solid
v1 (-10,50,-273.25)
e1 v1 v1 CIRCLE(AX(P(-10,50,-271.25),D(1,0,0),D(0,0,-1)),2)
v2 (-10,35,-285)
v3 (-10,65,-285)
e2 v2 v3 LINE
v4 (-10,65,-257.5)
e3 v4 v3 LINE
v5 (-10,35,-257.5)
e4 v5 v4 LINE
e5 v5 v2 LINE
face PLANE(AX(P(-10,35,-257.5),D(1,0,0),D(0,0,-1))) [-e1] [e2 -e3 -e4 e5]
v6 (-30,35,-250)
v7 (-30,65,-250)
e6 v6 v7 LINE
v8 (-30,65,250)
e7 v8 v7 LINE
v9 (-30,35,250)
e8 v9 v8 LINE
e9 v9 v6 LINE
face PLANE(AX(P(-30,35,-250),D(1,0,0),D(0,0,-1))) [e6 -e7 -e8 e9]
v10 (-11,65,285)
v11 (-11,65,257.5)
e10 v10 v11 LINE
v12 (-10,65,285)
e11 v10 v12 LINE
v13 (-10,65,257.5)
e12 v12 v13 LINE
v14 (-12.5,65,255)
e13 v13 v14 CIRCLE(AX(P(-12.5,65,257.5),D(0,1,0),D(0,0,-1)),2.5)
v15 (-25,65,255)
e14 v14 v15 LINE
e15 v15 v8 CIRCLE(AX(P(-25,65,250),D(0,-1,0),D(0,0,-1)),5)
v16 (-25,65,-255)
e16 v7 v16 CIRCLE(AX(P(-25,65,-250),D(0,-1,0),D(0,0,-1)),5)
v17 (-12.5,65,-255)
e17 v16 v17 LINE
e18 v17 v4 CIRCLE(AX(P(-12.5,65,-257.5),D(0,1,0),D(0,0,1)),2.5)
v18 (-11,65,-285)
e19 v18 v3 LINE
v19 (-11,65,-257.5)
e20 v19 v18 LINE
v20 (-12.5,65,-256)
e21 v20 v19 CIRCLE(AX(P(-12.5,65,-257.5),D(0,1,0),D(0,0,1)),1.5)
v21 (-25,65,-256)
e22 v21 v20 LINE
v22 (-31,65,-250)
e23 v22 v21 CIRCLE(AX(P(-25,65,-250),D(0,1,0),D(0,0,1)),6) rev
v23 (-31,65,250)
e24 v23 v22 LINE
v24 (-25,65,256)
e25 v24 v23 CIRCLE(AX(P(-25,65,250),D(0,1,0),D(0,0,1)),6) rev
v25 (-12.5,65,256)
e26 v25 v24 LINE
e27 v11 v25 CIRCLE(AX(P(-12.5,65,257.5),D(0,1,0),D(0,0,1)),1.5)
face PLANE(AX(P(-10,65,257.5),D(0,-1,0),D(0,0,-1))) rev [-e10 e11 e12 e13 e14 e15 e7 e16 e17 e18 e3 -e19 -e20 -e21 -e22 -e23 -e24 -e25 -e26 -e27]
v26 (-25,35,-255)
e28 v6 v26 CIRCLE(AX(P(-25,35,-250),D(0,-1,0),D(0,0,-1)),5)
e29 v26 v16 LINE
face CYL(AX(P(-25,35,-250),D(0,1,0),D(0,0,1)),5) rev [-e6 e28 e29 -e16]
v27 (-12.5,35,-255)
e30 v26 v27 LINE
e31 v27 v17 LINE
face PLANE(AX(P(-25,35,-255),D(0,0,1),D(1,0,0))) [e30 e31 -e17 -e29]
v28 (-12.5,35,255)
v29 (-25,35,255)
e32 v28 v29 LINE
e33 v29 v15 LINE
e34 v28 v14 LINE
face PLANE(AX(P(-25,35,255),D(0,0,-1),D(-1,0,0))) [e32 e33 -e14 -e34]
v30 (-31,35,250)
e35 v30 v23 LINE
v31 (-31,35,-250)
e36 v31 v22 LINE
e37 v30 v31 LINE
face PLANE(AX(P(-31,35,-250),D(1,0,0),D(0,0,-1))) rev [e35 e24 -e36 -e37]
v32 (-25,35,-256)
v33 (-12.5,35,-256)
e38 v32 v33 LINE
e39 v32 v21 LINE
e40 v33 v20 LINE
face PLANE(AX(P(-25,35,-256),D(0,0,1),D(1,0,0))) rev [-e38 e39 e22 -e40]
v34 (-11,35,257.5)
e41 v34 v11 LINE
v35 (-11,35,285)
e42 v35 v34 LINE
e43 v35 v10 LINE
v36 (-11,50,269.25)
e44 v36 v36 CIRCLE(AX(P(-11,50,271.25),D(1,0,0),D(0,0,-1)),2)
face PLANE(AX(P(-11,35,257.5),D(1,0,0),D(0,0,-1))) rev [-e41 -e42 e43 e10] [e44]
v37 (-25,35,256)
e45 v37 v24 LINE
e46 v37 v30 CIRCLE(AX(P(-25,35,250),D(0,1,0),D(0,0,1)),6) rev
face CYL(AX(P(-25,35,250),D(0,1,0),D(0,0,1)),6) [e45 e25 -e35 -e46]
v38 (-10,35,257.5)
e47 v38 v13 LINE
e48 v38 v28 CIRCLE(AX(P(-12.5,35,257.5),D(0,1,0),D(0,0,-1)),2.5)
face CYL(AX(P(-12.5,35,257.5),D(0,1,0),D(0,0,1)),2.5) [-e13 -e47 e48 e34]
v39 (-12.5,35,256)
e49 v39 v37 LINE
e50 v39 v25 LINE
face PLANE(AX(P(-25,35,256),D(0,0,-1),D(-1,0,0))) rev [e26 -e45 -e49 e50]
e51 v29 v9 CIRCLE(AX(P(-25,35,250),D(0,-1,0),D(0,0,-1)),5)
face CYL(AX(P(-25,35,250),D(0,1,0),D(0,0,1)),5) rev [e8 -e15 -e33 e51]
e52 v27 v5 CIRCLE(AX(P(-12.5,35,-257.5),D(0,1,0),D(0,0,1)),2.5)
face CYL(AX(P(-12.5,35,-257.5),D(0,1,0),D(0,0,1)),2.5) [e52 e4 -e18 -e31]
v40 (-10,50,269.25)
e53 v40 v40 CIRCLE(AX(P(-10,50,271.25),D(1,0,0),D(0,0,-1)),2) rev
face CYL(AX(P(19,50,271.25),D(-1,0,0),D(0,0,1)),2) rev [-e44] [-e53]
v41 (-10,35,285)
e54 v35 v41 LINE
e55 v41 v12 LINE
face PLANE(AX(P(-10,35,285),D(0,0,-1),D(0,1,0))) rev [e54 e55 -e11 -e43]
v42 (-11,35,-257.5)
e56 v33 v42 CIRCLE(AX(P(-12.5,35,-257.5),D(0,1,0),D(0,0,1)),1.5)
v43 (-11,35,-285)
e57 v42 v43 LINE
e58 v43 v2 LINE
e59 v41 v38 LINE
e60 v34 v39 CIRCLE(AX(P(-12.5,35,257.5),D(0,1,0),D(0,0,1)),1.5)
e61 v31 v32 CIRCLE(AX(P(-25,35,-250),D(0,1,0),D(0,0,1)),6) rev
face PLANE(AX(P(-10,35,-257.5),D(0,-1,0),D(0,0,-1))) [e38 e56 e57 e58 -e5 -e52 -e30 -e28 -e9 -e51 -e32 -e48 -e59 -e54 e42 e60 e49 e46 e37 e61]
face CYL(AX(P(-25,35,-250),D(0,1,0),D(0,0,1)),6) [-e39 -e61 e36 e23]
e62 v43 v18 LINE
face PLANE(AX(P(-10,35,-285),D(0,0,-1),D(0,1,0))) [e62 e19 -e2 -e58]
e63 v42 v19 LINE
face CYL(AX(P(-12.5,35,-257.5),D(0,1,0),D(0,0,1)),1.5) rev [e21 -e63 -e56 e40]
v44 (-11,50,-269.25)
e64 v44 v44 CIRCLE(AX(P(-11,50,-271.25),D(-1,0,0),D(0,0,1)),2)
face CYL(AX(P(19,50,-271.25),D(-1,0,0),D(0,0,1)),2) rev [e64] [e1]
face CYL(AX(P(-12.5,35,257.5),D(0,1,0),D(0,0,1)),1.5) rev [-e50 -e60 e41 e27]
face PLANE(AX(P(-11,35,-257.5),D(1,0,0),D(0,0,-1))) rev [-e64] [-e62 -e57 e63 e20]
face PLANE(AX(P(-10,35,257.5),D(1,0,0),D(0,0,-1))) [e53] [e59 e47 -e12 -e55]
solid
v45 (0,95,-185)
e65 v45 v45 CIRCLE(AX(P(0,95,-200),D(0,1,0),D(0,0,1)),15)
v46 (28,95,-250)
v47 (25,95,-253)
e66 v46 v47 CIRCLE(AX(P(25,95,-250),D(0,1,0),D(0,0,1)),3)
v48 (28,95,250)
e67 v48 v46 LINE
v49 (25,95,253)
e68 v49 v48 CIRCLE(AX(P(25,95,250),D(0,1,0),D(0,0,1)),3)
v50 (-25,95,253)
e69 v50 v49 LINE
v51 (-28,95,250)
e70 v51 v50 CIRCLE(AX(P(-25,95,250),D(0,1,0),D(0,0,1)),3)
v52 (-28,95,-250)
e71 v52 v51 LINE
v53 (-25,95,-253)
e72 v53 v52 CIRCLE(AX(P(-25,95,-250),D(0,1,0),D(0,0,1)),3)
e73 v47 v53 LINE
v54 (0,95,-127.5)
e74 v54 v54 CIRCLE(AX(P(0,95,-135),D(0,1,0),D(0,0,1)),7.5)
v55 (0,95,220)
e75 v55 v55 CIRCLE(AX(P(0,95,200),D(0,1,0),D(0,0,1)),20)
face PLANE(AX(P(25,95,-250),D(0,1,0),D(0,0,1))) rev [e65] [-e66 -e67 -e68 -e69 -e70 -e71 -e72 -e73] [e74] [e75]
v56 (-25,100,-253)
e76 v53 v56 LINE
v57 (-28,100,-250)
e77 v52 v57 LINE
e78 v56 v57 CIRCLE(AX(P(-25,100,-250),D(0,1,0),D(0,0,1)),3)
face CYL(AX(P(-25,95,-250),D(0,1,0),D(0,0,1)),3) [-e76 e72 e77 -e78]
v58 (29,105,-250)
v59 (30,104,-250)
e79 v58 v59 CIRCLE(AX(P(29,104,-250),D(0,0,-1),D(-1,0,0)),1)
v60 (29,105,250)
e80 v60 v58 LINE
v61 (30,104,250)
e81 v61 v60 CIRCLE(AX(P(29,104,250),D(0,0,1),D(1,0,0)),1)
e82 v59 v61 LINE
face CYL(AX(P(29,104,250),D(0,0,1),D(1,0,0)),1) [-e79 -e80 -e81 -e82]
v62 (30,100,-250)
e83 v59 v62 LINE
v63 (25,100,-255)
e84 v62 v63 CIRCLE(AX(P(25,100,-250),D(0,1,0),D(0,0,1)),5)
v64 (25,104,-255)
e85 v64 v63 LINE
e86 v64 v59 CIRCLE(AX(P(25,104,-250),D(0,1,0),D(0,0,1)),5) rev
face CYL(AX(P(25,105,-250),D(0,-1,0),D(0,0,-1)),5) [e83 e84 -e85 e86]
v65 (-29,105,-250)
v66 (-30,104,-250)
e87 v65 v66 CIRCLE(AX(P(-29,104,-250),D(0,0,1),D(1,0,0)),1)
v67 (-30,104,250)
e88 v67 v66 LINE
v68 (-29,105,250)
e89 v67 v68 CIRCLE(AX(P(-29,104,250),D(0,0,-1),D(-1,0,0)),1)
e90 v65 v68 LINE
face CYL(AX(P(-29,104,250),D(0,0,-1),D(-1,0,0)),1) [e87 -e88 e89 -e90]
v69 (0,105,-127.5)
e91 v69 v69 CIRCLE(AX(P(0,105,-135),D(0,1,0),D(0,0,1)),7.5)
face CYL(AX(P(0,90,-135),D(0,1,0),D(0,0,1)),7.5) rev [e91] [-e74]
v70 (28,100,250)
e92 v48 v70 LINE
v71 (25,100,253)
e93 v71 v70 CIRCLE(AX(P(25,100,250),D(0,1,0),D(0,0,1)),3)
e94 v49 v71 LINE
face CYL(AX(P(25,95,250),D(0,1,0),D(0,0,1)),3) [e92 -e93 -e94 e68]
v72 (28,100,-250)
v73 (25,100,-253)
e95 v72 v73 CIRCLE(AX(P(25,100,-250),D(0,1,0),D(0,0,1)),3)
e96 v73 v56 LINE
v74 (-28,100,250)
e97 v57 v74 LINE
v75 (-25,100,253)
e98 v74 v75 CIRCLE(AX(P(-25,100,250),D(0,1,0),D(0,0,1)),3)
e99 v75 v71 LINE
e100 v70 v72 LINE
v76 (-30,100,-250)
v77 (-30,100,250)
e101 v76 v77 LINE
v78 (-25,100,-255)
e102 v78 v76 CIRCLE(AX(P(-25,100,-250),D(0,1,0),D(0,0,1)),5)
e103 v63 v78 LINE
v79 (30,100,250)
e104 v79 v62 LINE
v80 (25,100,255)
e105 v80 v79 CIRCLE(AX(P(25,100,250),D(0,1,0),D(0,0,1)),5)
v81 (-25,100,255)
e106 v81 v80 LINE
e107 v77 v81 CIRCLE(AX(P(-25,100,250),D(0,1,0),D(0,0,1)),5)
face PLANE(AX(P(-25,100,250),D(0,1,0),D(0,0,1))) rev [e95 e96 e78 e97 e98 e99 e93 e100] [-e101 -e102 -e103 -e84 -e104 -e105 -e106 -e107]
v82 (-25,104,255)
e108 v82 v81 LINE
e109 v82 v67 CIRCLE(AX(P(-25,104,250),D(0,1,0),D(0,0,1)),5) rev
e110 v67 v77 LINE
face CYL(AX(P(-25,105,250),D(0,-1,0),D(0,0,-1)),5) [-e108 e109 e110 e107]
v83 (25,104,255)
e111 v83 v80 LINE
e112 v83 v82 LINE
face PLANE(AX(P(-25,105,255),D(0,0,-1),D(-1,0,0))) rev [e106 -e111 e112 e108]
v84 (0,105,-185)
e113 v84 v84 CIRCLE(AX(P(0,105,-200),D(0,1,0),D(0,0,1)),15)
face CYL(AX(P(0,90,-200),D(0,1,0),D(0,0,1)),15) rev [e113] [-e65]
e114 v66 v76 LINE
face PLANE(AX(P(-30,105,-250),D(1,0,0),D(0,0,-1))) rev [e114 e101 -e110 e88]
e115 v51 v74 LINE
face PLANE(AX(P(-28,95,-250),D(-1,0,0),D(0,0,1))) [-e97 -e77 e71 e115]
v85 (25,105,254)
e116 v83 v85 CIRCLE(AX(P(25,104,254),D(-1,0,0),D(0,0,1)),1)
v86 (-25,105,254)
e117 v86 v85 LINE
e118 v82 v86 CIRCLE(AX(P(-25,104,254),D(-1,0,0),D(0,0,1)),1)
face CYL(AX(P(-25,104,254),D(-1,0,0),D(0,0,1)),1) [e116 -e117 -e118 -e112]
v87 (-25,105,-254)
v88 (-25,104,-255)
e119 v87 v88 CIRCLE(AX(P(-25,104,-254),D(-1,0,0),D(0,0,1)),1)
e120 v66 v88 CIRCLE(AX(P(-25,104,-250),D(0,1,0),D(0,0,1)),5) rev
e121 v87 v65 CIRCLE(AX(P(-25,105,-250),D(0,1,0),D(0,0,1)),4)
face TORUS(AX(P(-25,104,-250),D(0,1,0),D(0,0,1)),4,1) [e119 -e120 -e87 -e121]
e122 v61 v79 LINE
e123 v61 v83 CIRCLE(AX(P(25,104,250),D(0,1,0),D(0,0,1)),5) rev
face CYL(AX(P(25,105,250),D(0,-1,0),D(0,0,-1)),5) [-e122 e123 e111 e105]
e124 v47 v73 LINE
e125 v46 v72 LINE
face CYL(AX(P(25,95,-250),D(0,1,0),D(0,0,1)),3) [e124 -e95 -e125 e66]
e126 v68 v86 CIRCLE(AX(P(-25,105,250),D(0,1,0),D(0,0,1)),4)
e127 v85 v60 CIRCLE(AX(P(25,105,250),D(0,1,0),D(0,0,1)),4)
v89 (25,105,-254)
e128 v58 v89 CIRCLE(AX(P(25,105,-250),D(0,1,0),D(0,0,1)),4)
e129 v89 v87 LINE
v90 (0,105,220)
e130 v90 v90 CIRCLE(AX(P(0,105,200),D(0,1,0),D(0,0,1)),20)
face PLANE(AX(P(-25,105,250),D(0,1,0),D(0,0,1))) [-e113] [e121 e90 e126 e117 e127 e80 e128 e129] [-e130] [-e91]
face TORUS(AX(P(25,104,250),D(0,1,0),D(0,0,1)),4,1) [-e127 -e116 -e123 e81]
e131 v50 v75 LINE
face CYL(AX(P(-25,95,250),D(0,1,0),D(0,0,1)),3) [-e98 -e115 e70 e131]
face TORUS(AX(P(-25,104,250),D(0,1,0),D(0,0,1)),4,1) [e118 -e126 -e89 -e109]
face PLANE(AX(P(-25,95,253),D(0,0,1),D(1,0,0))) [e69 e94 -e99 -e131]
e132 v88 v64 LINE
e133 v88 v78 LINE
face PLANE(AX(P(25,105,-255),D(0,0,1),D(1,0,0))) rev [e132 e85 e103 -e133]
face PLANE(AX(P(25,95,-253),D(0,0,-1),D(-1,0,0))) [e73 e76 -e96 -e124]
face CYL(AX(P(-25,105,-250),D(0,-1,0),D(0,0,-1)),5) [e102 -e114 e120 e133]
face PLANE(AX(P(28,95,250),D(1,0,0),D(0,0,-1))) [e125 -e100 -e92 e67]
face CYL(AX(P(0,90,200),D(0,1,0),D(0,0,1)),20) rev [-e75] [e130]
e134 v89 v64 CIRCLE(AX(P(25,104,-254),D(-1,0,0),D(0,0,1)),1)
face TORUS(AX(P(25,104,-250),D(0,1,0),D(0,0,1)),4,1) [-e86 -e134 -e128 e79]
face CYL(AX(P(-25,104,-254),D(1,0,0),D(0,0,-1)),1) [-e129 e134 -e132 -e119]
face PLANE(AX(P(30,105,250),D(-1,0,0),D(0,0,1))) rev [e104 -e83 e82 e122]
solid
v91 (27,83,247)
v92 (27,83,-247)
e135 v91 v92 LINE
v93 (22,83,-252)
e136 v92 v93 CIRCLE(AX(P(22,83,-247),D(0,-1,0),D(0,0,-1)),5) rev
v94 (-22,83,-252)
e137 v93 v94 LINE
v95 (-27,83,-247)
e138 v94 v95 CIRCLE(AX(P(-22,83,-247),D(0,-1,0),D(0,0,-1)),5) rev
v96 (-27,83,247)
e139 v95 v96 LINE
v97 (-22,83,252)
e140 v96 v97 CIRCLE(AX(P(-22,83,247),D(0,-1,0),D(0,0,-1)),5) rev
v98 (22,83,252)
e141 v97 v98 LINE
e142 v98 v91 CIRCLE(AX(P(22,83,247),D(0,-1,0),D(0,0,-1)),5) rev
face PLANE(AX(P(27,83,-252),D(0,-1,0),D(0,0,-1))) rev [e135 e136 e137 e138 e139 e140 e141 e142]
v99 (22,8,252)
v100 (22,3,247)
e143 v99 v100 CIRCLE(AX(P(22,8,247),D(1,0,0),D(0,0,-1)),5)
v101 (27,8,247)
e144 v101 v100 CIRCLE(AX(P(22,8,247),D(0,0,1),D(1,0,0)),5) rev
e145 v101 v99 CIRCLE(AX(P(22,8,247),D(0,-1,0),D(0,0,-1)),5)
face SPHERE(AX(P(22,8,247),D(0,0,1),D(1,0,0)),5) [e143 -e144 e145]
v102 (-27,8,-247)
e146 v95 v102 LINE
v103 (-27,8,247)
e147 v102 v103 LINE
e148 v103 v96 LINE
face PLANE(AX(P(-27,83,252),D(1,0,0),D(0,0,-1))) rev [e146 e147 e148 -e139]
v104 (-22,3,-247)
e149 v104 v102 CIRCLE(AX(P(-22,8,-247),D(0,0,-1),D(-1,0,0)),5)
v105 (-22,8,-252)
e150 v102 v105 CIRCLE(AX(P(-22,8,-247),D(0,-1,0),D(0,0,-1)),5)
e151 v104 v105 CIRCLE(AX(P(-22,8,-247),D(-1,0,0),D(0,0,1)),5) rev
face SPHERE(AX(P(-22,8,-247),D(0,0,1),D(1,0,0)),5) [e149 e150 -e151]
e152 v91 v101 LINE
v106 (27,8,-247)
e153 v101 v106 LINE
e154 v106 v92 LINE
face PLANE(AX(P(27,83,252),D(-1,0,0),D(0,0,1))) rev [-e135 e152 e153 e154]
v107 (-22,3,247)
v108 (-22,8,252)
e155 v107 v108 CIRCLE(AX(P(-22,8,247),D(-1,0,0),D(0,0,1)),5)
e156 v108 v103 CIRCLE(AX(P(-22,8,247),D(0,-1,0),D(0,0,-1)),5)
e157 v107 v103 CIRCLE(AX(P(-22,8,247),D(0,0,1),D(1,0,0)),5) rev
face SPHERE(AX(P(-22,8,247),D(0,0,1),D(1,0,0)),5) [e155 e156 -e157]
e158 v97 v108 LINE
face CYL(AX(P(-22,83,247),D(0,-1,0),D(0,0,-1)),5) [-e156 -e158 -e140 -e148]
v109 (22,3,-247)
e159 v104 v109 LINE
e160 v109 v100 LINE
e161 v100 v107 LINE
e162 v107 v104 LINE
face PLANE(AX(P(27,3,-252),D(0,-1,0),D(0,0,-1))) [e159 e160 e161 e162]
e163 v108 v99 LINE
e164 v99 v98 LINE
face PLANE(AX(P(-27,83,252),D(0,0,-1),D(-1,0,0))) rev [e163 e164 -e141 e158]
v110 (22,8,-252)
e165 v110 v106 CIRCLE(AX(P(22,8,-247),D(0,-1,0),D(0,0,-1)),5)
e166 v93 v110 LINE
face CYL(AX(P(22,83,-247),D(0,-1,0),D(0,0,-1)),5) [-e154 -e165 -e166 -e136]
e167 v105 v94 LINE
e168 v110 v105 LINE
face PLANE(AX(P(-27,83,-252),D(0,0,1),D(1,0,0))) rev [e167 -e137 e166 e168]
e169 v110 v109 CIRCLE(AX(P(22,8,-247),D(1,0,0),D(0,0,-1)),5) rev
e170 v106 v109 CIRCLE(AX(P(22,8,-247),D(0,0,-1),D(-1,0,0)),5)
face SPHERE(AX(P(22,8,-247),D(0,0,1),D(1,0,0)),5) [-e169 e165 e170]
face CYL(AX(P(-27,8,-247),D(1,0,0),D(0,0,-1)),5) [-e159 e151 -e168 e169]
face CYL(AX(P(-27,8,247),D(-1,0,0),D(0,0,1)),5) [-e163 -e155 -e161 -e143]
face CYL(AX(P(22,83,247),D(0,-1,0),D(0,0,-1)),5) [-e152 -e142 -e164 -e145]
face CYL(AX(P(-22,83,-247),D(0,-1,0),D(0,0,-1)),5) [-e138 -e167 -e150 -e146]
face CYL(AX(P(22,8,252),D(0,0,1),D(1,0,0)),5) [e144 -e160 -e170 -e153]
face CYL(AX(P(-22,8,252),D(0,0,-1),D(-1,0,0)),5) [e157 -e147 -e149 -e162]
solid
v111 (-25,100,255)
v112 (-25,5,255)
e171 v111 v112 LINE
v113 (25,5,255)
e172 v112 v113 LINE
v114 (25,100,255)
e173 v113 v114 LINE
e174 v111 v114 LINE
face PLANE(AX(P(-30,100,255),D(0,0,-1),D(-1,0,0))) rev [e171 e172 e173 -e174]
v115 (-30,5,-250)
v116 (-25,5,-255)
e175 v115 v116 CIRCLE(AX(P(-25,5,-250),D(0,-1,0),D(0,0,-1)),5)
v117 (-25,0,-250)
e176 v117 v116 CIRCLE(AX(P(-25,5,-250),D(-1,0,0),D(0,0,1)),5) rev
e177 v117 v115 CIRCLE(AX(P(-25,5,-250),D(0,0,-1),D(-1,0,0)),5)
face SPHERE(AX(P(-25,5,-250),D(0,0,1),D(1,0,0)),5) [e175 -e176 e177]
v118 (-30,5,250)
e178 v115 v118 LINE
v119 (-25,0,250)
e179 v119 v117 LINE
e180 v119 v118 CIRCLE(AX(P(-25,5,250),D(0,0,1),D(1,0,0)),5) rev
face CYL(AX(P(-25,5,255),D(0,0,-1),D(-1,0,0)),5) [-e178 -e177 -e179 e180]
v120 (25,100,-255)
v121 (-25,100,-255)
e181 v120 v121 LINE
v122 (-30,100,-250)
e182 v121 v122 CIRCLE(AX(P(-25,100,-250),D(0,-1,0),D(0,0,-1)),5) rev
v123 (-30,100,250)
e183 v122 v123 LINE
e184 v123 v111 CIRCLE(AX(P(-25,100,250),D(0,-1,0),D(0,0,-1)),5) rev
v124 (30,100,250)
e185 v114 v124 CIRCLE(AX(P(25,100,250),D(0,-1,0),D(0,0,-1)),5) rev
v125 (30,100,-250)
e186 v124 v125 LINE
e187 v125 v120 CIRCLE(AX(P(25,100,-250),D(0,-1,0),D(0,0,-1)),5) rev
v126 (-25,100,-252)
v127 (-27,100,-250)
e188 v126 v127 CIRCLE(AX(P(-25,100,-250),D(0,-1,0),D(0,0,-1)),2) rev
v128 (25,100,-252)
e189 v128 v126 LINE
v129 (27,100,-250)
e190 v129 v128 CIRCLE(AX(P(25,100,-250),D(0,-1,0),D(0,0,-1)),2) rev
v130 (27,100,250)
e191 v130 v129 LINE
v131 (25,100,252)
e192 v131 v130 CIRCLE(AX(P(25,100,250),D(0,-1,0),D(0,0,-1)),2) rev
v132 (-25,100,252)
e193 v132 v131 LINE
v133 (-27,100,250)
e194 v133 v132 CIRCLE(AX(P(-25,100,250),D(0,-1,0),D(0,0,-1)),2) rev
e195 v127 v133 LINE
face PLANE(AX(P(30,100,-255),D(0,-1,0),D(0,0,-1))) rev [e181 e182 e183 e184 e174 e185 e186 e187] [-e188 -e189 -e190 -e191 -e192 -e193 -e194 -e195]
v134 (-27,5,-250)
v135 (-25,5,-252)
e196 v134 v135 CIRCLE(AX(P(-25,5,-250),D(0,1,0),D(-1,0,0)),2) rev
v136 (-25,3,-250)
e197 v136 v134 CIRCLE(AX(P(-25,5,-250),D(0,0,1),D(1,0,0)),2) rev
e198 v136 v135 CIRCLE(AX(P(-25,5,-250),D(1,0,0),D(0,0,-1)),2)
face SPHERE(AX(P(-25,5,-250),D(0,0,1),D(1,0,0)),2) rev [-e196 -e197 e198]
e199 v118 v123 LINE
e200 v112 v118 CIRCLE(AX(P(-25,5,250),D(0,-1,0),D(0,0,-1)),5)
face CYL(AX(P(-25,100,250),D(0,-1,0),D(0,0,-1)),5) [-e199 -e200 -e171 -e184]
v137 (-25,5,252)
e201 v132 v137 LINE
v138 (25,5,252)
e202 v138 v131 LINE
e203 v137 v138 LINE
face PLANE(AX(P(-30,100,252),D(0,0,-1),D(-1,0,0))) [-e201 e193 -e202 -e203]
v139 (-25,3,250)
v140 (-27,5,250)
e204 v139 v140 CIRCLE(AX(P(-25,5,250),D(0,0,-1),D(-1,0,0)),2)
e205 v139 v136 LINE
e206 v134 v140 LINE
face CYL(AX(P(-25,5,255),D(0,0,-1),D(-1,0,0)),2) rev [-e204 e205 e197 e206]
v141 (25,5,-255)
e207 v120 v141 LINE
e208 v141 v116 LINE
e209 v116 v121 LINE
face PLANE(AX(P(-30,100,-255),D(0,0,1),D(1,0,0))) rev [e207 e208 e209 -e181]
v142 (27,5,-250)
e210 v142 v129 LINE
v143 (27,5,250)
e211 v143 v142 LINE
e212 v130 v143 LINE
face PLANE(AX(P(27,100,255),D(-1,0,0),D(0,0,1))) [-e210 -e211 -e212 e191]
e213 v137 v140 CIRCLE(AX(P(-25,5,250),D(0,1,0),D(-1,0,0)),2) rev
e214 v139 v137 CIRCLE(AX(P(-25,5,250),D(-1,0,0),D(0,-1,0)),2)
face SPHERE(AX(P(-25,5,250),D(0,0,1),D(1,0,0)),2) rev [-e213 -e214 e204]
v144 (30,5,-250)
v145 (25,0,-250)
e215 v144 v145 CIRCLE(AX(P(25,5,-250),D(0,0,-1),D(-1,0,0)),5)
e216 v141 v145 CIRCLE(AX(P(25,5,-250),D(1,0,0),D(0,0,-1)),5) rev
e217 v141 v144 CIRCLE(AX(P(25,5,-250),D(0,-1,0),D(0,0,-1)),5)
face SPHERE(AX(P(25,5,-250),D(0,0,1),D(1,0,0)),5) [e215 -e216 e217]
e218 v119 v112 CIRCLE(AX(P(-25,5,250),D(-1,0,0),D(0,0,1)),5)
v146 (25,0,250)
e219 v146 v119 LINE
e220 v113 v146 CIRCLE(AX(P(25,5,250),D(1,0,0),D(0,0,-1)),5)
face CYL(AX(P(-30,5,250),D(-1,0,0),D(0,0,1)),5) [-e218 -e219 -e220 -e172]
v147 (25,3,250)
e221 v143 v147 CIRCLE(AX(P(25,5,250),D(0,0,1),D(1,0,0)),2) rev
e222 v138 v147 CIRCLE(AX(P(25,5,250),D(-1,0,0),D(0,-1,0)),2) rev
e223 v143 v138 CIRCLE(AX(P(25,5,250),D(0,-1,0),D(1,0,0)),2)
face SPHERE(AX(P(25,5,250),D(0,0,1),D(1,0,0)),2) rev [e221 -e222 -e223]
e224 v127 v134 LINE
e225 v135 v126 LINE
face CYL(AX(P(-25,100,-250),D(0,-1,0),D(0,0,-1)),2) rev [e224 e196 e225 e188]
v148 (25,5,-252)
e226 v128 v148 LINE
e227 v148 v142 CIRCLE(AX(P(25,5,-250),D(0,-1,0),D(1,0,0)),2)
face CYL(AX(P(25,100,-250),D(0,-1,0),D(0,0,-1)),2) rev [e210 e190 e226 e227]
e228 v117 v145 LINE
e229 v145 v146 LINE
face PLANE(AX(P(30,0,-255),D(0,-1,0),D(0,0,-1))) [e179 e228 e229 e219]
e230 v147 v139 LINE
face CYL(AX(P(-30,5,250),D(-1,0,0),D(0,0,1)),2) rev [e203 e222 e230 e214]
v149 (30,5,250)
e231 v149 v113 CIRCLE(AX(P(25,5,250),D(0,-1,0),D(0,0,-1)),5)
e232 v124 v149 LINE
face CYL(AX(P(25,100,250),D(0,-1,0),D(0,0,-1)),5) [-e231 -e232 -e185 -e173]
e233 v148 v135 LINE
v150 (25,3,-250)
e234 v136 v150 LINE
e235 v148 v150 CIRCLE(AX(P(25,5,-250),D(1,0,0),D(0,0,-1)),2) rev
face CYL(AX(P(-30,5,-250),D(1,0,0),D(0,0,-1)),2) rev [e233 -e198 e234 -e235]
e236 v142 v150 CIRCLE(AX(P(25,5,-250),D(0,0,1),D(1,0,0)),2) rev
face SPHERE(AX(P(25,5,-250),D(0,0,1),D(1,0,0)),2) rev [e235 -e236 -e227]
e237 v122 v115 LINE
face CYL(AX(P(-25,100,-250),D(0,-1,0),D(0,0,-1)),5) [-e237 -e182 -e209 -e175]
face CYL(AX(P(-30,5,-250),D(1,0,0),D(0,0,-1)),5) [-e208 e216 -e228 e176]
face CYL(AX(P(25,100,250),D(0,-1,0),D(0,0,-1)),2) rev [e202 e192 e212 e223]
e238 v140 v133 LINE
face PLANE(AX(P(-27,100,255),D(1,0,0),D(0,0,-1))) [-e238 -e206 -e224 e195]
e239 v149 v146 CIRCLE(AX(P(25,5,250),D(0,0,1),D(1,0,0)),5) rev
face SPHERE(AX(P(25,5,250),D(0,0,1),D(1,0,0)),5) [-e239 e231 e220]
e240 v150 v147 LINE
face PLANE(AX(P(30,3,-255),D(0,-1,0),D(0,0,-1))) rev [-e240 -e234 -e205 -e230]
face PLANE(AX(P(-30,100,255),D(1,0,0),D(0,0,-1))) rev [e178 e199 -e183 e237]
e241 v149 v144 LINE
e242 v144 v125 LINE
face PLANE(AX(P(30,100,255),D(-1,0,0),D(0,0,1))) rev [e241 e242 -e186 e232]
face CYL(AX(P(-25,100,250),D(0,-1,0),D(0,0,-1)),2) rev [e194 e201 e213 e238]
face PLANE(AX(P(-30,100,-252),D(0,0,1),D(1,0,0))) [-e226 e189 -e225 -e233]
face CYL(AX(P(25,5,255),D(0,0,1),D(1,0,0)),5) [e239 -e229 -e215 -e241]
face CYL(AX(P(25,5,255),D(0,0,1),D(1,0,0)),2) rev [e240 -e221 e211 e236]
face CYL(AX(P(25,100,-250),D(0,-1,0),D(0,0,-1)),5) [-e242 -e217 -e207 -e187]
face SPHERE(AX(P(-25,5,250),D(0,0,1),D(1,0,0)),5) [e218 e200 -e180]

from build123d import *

# Parameters (mm, degrees)
CROQUIS1_W         = 60
CROQUIS1_H         = 510
EXTRUIR1_DEPTH     = 100
REDONDEO1_R        = 5
VACIADO1_T         = -3
CROQUIS2_W         = 54
CROQUIS2_H         = 504
EXTRUIR2_DEPTH     = 80
REDONDEO2_R        = 5
EXTRUIR3_DEPTH     = 5
EXTRUIR4_START     = 5
EXTRUIR4_DEPTH     = 5
REDONDEO3_R        = 1
CROQUIS5_R         = 15
CROQUIS5_R_2       = 7.5
CROQUIS5_R_3       = 20
EXTRUIR5_DEPTH     = 15
DAR_START          = 35
DAR_ESPESOR1_DEPTH = 30
CROQUIS7_R         = 2
EXTRUIR6_DEPTH     = 30


# Read off the part's stored shape, not the designer's step: Dar espesor1
with BuildPart() as part:
    # Croquis1 → Extruir1 (new body)
    with BuildSketch(Plane(origin=(0, 0, 0), x_dir=(1, 0, 0), z_dir=(0, 1, 0))):
        Rectangle(CROQUIS1_W, CROQUIS1_H)
    extrude(amount=EXTRUIR1_DEPTH)

    # Redondeo1
    redondeo1_edges = [part.edges().sort_by_distance(p)[0] for p in [
        (0, 0, 255),
        (-30, 0, 0),
        (0, 0, -255),
        (30, 0, 0),
        (30, 50, 255),
        (-30, 50, 255),
        (-30, 50, -255),
        (30, 50, -255),
    ]]
    fillet(redondeo1_edges, radius=REDONDEO1_R)

    # Vaciado1
    vaciado1_openings = [part.faces().sort_by_distance(p)[0] for p in [
        (0, 100, 0),
    ]]
    offset(amount=VACIADO1_T, openings=vaciado1_openings, kind=Kind.INTERSECTION)


with BuildPart() as body_2:
    # Croquis2 → Extruir2 (new body)
    with BuildSketch(Plane(origin=(0, 3, 0), x_dir=(1, 0, 0), z_dir=(0, 1, 0))):
        Rectangle(CROQUIS2_W, CROQUIS2_H)
    extrude(amount=EXTRUIR2_DEPTH)

    # Redondeo2
    redondeo2_edges = [body_2.edges().sort_by_distance(p)[0] for p in [
        (0, 3, 252),
        (-27, 3, 0),
        (0, 3, -252),
        (27, 3, 0),
        (27, 43, 252),
        (-27, 43, 252),
        (-27, 43, -252),
        (27, 43, -252),
    ]]
    fillet(redondeo2_edges, radius=REDONDEO2_R)


with BuildPart() as body_3:
    # Croquis3 → Extruir3 (new body)
    with BuildSketch(Plane(origin=(0, 100, 0), x_dir=(1, 0, 0), z_dir=(0, 1, 0))):
        with BuildLine():
            Line((25, 253), (-25, 253))
            ThreePointArc((-25, 253), (-27.121320344, 252.121320344), (-28, 250))
            Line((-28, 250), (-28, -250))
            ThreePointArc((-28, -250), (-27.121320344, -252.121320344), (-25, -253))
            Line((-25, -253), (25, -253))
            ThreePointArc((25, -253), (27.121320344, -252.121320344), (28, -250))
            Line((28, -250), (28, 250))
            ThreePointArc((28, 250), (27.121320344, 252.121320344), (25, 253))
        make_face()
    extrude(amount=-EXTRUIR3_DEPTH)

    # Croquis4 → Extruir4 (add)
    with BuildSketch(Plane(origin=(0, 100, 0), x_dir=(1, 0, 0), z_dir=(0, 1, 0)).offset(EXTRUIR4_START)):
        with BuildLine():
            Line((-25, -255), (25, -255))
            ThreePointArc((25, -255), (28.535533906, -253.535533906), (30, -250))
            Line((30, -250), (30, 250))
            ThreePointArc((30, 250), (28.535533906, 253.535533906), (25, 255))
            Line((25, 255), (-25, 255))
            ThreePointArc((-25, 255), (-28.535533906, 253.535533906), (-30, 250))
            Line((-30, 250), (-30, -250))
            ThreePointArc((-30, -250), (-28.535533906, -253.535533906), (-25, -255))
        make_face()
    extrude(amount=-EXTRUIR4_DEPTH)

    # Redondeo3
    redondeo3_edges = [body_3.edges().sort_by_distance(p)[0] for p in [
        (-28.535533906, 105, 253.535533906),
        (0, 105, 255),
        (28.535533906, 105, 253.535533906),
        (30, 105, 0),
        (28.535533906, 105, -253.535533906),
        (0, 105, -255),
        (-28.535533906, 105, -253.535533906),
        (-30, 105, 0),
    ]]
    fillet(redondeo3_edges, radius=REDONDEO3_R)

    # Croquis5 → Extruir5 (cut)
    with BuildSketch(Plane(origin=(0, 105, 0), x_dir=(1, 0, 0), z_dir=(0, 1, 0))):
        with Locations(Location((0, 200, 0), (0, 0, 270))):
            Circle(CROQUIS5_R)
        with Locations(Location((0, 135, 0), (0, 0, 270))):
            Circle(CROQUIS5_R_2)
        with Locations(Location((0, -200, 0), (0, 0, 270))):
            Circle(CROQUIS5_R_3)
    extrude(amount=-EXTRUIR5_DEPTH, mode=Mode.SUBTRACT)


with BuildPart() as body_4:
    # Dar espesor1 outline → Dar espesor1 (new body)
    with BuildSketch(Plane(origin=(0, 0, 0), x_dir=(1, 0, 0), z_dir=(0, 1, 0)).offset(DAR_START)):
        with BuildLine():
            Line((-10, 257.5), (-10, 285))
            Line((-10, 285), (-11, 285))
            Line((-11, 285), (-11, 257.5))
            ThreePointArc((-11, 257.5), (-11.439339828, 256.439339828), (-12.5, 256))
            Line((-12.5, 256), (-25, 256))
            ThreePointArc((-25, 256), (-29.242640687, 254.242640687), (-31, 250))
            Line((-31, 250), (-31, -250))
            ThreePointArc((-31, -250), (-29.242640687, -254.242640687), (-25, -256))
            Line((-25, -256), (-12.5, -256))
            ThreePointArc((-12.5, -256), (-11.439339828, -256.439339828), (-11, -257.5))
            Line((-11, -257.5), (-11, -285))
            Line((-11, -285), (-10, -285))
            Line((-10, -285), (-10, -257.5))
            ThreePointArc((-10, -257.5), (-10.732233047, -255.732233047), (-12.5, -255))
            Line((-12.5, -255), (-25, -255))
            ThreePointArc((-25, -255), (-28.535533906, -253.535533906), (-30, -250))
            Line((-30, -250), (-30, 250))
            ThreePointArc((-30, 250), (-28.535533906, 253.535533906), (-25, 255))
            Line((-25, 255), (-12.5, 255))
            ThreePointArc((-12.5, 255), (-10.732233047, 255.732233047), (-10, 257.5))
        make_face()
    extrude(amount=DAR_ESPESOR1_DEPTH)

    # Croquis7 → Extruir6 (cut)
    with BuildSketch(Plane.ZY.offset(11)):
        with Locations((-271.25, 50)):
            Circle(CROQUIS7_R)
    extruir6 = extrude(amount=-EXTRUIR6_DEPTH, mode=Mode.SUBTRACT)

    # Simetría1: Extruir6 across plane
    add(extruir6.mirror(Plane.XY), mode=Mode.SUBTRACT)


solid = Compound([part.part, body_2.part, body_3.part, body_4.part])
